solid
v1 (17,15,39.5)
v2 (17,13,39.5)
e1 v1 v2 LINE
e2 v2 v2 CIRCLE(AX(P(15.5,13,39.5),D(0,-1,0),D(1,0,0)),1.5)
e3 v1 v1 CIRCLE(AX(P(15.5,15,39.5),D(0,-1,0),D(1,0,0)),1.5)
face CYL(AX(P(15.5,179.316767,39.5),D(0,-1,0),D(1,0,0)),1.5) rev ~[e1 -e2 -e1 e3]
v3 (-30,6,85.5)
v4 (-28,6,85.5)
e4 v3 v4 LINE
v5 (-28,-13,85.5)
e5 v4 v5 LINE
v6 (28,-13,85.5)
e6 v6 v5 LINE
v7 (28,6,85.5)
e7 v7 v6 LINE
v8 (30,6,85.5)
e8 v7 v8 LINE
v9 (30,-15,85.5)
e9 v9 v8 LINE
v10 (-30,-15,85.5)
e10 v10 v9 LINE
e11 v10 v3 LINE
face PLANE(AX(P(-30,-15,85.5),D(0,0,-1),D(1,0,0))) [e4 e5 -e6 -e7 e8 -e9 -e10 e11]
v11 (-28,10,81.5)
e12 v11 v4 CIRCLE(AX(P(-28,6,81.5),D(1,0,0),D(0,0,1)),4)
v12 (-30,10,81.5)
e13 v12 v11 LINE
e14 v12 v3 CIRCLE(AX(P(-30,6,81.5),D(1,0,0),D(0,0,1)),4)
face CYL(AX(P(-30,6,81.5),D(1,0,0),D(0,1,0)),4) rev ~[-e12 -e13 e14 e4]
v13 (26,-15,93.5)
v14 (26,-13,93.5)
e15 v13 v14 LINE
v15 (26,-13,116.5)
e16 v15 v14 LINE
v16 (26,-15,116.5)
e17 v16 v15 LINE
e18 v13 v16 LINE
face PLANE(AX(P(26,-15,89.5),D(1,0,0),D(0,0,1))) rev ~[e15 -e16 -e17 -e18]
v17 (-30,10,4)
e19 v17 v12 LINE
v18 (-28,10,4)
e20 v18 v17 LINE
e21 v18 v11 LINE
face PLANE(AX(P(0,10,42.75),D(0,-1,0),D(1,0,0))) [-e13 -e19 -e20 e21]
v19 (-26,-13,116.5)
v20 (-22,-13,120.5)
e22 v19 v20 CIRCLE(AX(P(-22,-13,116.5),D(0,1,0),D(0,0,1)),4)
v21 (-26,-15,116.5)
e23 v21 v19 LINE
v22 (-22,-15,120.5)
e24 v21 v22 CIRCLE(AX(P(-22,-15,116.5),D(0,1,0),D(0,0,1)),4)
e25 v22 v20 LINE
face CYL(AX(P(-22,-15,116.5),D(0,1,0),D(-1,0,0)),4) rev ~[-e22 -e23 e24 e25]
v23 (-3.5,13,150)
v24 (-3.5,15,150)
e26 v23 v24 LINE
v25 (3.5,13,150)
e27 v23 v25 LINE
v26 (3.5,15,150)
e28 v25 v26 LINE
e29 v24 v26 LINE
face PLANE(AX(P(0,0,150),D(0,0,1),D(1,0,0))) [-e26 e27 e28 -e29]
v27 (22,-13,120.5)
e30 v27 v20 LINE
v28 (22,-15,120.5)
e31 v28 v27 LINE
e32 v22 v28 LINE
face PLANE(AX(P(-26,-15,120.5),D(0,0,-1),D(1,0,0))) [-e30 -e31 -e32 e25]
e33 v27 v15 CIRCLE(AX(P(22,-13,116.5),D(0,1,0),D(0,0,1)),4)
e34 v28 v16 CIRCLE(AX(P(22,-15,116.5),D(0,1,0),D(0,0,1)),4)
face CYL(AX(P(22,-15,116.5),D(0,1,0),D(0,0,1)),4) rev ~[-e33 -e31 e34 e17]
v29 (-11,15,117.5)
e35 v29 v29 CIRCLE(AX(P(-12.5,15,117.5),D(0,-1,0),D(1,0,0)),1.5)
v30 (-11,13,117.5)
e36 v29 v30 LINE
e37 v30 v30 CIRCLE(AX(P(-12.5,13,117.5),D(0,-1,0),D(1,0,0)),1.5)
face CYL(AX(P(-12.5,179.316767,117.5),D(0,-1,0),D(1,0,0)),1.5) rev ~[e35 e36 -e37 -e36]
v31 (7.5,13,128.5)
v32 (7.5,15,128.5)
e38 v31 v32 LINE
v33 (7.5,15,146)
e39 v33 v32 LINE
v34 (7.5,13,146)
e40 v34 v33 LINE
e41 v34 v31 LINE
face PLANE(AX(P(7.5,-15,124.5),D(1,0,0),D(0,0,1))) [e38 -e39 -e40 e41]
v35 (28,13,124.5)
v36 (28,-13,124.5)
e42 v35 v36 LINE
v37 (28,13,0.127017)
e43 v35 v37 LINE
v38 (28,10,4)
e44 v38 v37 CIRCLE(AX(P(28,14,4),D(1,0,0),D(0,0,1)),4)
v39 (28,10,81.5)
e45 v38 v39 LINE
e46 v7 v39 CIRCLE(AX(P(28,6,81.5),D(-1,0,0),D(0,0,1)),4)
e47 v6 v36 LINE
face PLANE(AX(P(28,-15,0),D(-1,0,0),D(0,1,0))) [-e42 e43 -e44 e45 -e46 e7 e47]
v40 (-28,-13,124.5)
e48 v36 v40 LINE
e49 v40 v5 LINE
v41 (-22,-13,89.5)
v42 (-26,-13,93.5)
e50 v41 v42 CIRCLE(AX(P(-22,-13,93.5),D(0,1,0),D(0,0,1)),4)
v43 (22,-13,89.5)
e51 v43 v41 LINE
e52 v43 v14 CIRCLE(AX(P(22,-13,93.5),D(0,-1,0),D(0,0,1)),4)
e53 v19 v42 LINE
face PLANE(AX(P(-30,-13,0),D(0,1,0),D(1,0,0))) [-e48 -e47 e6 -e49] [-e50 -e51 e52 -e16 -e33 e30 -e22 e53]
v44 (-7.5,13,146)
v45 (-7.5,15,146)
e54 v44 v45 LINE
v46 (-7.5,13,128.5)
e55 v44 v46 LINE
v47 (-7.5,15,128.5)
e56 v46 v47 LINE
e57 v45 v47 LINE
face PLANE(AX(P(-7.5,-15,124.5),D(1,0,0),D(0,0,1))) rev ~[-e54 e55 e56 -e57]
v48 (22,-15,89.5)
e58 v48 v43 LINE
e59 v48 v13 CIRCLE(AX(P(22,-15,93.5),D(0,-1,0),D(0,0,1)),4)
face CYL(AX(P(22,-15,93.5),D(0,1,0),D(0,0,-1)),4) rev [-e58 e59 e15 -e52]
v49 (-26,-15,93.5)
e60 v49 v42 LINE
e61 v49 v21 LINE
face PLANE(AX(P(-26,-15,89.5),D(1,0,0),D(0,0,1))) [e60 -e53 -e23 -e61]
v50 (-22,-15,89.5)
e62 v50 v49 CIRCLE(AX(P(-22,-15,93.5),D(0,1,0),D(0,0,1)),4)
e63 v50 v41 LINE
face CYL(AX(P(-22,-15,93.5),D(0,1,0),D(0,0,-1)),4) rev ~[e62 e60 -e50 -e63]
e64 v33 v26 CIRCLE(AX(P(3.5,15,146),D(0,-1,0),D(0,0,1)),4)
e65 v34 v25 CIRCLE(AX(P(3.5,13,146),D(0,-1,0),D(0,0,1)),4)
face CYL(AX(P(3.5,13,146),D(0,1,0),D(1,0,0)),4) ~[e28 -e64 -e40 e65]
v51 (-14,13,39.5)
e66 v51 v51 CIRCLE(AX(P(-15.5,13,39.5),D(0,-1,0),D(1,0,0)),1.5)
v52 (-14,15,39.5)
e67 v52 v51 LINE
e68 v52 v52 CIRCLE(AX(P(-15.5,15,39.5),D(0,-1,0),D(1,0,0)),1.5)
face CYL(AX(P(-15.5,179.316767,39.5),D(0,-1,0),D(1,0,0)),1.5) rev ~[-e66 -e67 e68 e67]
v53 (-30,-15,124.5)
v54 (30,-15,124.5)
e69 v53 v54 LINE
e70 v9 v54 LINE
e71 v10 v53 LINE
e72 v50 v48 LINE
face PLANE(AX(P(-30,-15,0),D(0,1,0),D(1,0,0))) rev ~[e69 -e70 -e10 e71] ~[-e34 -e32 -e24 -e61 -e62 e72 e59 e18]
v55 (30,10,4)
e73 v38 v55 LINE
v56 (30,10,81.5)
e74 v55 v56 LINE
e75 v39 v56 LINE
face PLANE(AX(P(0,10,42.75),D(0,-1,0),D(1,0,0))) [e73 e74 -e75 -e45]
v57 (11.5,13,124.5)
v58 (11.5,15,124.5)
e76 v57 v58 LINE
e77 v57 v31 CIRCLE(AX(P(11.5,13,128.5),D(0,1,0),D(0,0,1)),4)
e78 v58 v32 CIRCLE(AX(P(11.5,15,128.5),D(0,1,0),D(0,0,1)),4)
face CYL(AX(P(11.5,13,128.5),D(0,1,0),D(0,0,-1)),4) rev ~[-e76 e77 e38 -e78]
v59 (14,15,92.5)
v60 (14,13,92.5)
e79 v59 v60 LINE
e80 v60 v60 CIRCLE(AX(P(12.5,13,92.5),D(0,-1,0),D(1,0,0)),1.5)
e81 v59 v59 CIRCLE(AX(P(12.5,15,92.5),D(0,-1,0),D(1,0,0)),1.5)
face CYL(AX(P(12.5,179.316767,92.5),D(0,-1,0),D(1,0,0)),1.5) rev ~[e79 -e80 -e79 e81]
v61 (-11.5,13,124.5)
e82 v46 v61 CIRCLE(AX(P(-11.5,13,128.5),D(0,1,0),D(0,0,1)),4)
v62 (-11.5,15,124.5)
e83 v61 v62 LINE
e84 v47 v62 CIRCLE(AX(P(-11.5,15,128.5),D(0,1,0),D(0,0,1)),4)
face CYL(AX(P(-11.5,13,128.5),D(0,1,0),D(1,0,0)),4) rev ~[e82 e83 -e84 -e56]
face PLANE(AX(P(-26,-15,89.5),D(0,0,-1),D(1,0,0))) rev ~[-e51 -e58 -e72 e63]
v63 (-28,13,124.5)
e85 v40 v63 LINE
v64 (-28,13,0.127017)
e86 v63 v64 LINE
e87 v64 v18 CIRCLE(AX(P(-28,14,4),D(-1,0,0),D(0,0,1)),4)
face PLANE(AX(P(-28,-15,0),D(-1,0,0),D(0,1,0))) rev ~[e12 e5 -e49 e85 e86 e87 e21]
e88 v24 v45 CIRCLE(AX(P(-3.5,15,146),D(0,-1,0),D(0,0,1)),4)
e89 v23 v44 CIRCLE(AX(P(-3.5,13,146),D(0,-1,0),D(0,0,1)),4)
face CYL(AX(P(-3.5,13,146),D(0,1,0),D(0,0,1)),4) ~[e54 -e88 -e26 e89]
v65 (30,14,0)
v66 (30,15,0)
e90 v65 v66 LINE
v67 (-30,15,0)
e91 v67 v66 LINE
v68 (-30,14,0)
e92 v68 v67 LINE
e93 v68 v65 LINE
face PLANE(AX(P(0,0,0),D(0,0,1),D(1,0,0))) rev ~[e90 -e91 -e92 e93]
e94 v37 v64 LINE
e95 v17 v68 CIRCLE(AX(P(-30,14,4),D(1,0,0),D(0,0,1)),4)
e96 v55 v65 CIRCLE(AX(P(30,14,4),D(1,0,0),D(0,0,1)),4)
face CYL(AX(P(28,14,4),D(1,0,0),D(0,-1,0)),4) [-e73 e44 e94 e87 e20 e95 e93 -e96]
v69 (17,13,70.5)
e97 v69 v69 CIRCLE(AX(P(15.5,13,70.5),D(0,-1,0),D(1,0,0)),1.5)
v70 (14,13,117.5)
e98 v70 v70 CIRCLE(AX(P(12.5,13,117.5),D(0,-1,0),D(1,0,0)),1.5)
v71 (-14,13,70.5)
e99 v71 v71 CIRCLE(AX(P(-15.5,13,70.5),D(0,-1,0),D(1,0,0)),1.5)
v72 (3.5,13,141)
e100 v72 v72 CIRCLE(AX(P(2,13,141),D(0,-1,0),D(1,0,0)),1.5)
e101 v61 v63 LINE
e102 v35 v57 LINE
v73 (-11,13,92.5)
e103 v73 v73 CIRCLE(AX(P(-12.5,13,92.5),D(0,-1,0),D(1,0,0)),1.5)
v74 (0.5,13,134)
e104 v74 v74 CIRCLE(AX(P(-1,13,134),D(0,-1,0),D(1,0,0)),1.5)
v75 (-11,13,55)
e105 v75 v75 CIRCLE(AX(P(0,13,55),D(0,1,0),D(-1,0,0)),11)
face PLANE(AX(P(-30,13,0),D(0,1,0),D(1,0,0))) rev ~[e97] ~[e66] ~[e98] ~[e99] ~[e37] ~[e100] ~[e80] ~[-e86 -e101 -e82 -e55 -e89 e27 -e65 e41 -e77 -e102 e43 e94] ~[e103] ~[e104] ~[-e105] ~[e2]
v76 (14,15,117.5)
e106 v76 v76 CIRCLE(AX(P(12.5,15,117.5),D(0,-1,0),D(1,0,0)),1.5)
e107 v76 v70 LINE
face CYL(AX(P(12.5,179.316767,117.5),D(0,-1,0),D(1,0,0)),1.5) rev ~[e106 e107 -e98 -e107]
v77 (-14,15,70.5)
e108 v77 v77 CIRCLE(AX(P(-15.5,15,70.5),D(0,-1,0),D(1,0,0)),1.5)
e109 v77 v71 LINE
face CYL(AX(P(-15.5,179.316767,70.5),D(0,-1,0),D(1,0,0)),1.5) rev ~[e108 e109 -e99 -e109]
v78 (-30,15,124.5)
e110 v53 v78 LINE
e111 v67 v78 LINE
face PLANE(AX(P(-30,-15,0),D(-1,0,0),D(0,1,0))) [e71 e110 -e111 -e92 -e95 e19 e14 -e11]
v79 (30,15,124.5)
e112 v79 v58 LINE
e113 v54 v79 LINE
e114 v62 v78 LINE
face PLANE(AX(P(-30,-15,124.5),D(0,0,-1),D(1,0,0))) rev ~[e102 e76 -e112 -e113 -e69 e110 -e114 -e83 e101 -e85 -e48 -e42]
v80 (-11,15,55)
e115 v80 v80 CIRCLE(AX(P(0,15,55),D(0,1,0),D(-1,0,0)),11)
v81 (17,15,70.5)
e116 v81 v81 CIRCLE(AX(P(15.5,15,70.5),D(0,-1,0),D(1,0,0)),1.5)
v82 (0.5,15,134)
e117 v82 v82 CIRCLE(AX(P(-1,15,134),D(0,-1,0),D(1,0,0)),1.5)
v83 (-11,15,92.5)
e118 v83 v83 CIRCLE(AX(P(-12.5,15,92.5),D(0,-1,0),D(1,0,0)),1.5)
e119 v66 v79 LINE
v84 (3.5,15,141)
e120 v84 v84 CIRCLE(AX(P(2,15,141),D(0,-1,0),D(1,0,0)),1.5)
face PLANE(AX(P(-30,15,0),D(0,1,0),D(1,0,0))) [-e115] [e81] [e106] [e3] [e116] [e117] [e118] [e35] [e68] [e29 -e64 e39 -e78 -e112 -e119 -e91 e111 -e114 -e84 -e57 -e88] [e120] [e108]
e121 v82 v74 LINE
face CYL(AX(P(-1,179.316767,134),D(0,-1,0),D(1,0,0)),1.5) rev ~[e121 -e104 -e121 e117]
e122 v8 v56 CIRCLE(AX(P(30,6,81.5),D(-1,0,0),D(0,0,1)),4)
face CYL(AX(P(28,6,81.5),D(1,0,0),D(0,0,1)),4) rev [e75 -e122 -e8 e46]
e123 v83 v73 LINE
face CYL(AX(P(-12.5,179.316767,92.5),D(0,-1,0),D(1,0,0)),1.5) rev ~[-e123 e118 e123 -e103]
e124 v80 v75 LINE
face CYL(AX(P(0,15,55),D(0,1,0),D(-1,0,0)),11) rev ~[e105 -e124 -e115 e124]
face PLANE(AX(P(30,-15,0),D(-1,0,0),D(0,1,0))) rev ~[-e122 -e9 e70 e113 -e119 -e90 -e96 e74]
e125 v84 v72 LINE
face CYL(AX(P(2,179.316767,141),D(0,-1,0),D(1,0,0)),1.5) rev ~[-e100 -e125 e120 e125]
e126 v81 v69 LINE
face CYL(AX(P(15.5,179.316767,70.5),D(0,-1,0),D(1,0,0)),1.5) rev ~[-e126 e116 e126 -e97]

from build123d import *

# Parameters (mm, degrees)
F0_W      = 60
F0_H      = 30
F1_DEPTH  = 150
F2_T      = -2
F4_D      = 3
F3_R      = 11
F5_DEPTH  = 30.001
F6_D      = 3
F7_D      = 3
F8_W      = 52
F8_H      = 31
F8_R      = 1.5
F8_W_2    = 60
F8_H_2    = 85.5
F8_R_2    = 11
F8_W_3    = 15
F8_H_3    = 25.5
F8_W_4    = 22.5
F9_DEPTH  = 25
F10_DEPTH = 30.001
F11_F1_R  = 4
F11_F2_R  = 4
F11_F3_R  = 4
F11_F4_R  = 4
F11_F5_R  = 4
F11_F6_R  = 4
F11_F7_R  = 4
F11_F8_R  = 4
F11_F9_R  = 4
F11_F10_R = 4
F11_F11_R = 4


with BuildPart() as f1:
    # F0 (on Top) → F1 (new body)
    with BuildSketch(Plane.XY):
        Rectangle(F0_W, F0_H)
    extrude(amount=F1_DEPTH)

    # F2
    f2_openings = [f1.faces().sort_by_distance(p)[0] for p in [
        (0, 0, 150),
        (0, 0, 0),
    ]]
    offset(amount=F2_T, openings=f2_openings)

    # F4 (through all)
    with Locations(Plane(origin=(0, 15, 0), x_dir=(-1, 0, 0), z_dir=(0, 1, 0))):
        with Locations((-12.5, 117.5), (12.5, 117.5), (-12.5, 92.5), (12.5, 92.5)):
            Hole(F4_D / 2)

    # F3 (on face) → F5 (cut, through all)
    with BuildSketch(Plane(origin=(0, 15, 0), x_dir=(-1, 0, 0), z_dir=(0, 1, 0))):
        with Locations((0, 55)):
            Circle(F3_R)
    extrude(amount=-F5_DEPTH, mode=Mode.SUBTRACT)

    # F6 (through all)
    with Locations(Plane(origin=(0, 15, 0), x_dir=(-1, 0, 0), z_dir=(0, 1, 0))):
        with Locations((-15.5, 70.5), (15.5, 70.5), (-15.5, 39.5), (15.5, 39.5)):
            Hole(F6_D / 2)

    # F7 (through all)
    with Locations(Plane(origin=(0, 15, 0), x_dir=(-1, 0, 0), z_dir=(0, 1, 0))):
        with Locations((-2, 141), (1, 134)):
            Hole(F7_D / 2)

    # F8 (on face) → F9 (cut)
    with BuildSketch(Plane.XZ.offset(15)):
        with Locations((0, 105)):
            Rectangle(F8_W, F8_H)
        with Locations((-12.5, 92.5)):
            Circle(F8_R, mode=Mode.SUBTRACT)
        with Locations((-12.5, 117.5)):
            Circle(F8_R, mode=Mode.SUBTRACT)
        with Locations((12.5, 92.5)):
            Circle(F8_R, mode=Mode.SUBTRACT)
        with Locations((12.5, 117.5)):
            Circle(F8_R, mode=Mode.SUBTRACT)
        with Locations((0, 42.75)):
            Rectangle(F8_W_2, F8_H_2)
        with Locations((-15.5, 39.5)):
            Circle(F8_R, mode=Mode.SUBTRACT)
        with Locations((-15.5, 70.5)):
            Circle(F8_R, mode=Mode.SUBTRACT)
        with Locations((0, 55)):
            Circle(F8_R_2, mode=Mode.SUBTRACT)
        with Locations((15.5, 39.5)):
            Circle(F8_R, mode=Mode.SUBTRACT)
        with Locations((15.5, 70.5)):
            Circle(F8_R, mode=Mode.SUBTRACT)
        with Locations((0, 137.25)):
            Rectangle(F8_W_3, F8_H_3)
        with Locations((-1, 134)):
            Circle(F8_R, mode=Mode.SUBTRACT)
        with Locations((2, 141)):
            Circle(F8_R, mode=Mode.SUBTRACT)
        with Locations((18.75, 137.25)):
            Rectangle(F8_W_4, F8_H_3)
        with Locations((-18.75, 137.25)):
            Rectangle(F8_W_4, F8_H_3)
    extrude(amount=-F9_DEPTH, mode=Mode.SUBTRACT)

    # F8 (on face) → F10 (cut, through all)
    with BuildSketch(Plane.XZ.offset(15)):
        with Locations((-18.75, 137.25)):
            Rectangle(F8_W_4, F8_H_3)
        with Locations((18.75, 137.25)):
            Rectangle(F8_W_4, F8_H_3)
    extrude(amount=-F10_DEPTH, mode=Mode.SUBTRACT)

    # F11: fillet of radius 4 on 12 edges, made by hand

    # F11_f1
    f11_f1_edges = [f1.edges().sort_by_distance(p)[0] for p in [
        (29, 10, 0),
    ]]
    fillet(f11_f1_edges, radius=F11_F1_R)

    # F11_f2
    f11_f2_edges = [f1.edges().sort_by_distance(p)[0] for p in [
        (29, 10, 85.5),
    ]]
    fillet(f11_f2_edges, radius=F11_F2_R)

    # F11_f3
    f11_f3_edges = [f1.edges().sort_by_distance(p)[0] for p in [
        (7.5, 14, 124.5),
    ]]
    fillet(f11_f3_edges, radius=F11_F3_R)

    # F11_f4
    f11_f4_edges = [f1.edges().sort_by_distance(p)[0] for p in [
        (7.5, 14, 150),
    ]]
    fillet(f11_f4_edges, radius=F11_F4_R)

    # F11_f5
    f11_f5_edges = [f1.edges().sort_by_distance(p)[0] for p in [
        (-7.5, 14, 150),
    ]]
    fillet(f11_f5_edges, radius=F11_F5_R)

    # F11_f6
    f11_f6_edges = [f1.edges().sort_by_distance(p)[0] for p in [
        (-7.5, 14, 124.5),
    ]]
    fillet(f11_f6_edges, radius=F11_F6_R)

    # F11_f7
    f11_f7_edges = [f1.edges().sort_by_distance(p)[0] for p in [
        (-29, 10, 85.5),
    ]]
    fillet(f11_f7_edges, radius=F11_F7_R)

    # F11_f8
    f11_f8_edges = [f1.edges().sort_by_distance(p)[0] for p in [
        (26, -14, 89.5),
    ]]
    fillet(f11_f8_edges, radius=F11_F8_R)

    # F11_f9
    f11_f9_edges = [f1.edges().sort_by_distance(p)[0] for p in [
        (-26, -14, 89.5),
    ]]
    fillet(f11_f9_edges, radius=F11_F9_R)

    # F11_f10
    f11_f10_edges = [f1.edges().sort_by_distance(p)[0] for p in [
        (-26, -14, 120.5),
    ]]
    fillet(f11_f10_edges, radius=F11_F10_R)

    # F11_f11
    f11_f11_edges = [f1.edges().sort_by_distance(p)[0] for p in [
        (26, -14, 120.5),
    ]]
    fillet(f11_f11_edges, radius=F11_F11_R)


solid = f1.part
